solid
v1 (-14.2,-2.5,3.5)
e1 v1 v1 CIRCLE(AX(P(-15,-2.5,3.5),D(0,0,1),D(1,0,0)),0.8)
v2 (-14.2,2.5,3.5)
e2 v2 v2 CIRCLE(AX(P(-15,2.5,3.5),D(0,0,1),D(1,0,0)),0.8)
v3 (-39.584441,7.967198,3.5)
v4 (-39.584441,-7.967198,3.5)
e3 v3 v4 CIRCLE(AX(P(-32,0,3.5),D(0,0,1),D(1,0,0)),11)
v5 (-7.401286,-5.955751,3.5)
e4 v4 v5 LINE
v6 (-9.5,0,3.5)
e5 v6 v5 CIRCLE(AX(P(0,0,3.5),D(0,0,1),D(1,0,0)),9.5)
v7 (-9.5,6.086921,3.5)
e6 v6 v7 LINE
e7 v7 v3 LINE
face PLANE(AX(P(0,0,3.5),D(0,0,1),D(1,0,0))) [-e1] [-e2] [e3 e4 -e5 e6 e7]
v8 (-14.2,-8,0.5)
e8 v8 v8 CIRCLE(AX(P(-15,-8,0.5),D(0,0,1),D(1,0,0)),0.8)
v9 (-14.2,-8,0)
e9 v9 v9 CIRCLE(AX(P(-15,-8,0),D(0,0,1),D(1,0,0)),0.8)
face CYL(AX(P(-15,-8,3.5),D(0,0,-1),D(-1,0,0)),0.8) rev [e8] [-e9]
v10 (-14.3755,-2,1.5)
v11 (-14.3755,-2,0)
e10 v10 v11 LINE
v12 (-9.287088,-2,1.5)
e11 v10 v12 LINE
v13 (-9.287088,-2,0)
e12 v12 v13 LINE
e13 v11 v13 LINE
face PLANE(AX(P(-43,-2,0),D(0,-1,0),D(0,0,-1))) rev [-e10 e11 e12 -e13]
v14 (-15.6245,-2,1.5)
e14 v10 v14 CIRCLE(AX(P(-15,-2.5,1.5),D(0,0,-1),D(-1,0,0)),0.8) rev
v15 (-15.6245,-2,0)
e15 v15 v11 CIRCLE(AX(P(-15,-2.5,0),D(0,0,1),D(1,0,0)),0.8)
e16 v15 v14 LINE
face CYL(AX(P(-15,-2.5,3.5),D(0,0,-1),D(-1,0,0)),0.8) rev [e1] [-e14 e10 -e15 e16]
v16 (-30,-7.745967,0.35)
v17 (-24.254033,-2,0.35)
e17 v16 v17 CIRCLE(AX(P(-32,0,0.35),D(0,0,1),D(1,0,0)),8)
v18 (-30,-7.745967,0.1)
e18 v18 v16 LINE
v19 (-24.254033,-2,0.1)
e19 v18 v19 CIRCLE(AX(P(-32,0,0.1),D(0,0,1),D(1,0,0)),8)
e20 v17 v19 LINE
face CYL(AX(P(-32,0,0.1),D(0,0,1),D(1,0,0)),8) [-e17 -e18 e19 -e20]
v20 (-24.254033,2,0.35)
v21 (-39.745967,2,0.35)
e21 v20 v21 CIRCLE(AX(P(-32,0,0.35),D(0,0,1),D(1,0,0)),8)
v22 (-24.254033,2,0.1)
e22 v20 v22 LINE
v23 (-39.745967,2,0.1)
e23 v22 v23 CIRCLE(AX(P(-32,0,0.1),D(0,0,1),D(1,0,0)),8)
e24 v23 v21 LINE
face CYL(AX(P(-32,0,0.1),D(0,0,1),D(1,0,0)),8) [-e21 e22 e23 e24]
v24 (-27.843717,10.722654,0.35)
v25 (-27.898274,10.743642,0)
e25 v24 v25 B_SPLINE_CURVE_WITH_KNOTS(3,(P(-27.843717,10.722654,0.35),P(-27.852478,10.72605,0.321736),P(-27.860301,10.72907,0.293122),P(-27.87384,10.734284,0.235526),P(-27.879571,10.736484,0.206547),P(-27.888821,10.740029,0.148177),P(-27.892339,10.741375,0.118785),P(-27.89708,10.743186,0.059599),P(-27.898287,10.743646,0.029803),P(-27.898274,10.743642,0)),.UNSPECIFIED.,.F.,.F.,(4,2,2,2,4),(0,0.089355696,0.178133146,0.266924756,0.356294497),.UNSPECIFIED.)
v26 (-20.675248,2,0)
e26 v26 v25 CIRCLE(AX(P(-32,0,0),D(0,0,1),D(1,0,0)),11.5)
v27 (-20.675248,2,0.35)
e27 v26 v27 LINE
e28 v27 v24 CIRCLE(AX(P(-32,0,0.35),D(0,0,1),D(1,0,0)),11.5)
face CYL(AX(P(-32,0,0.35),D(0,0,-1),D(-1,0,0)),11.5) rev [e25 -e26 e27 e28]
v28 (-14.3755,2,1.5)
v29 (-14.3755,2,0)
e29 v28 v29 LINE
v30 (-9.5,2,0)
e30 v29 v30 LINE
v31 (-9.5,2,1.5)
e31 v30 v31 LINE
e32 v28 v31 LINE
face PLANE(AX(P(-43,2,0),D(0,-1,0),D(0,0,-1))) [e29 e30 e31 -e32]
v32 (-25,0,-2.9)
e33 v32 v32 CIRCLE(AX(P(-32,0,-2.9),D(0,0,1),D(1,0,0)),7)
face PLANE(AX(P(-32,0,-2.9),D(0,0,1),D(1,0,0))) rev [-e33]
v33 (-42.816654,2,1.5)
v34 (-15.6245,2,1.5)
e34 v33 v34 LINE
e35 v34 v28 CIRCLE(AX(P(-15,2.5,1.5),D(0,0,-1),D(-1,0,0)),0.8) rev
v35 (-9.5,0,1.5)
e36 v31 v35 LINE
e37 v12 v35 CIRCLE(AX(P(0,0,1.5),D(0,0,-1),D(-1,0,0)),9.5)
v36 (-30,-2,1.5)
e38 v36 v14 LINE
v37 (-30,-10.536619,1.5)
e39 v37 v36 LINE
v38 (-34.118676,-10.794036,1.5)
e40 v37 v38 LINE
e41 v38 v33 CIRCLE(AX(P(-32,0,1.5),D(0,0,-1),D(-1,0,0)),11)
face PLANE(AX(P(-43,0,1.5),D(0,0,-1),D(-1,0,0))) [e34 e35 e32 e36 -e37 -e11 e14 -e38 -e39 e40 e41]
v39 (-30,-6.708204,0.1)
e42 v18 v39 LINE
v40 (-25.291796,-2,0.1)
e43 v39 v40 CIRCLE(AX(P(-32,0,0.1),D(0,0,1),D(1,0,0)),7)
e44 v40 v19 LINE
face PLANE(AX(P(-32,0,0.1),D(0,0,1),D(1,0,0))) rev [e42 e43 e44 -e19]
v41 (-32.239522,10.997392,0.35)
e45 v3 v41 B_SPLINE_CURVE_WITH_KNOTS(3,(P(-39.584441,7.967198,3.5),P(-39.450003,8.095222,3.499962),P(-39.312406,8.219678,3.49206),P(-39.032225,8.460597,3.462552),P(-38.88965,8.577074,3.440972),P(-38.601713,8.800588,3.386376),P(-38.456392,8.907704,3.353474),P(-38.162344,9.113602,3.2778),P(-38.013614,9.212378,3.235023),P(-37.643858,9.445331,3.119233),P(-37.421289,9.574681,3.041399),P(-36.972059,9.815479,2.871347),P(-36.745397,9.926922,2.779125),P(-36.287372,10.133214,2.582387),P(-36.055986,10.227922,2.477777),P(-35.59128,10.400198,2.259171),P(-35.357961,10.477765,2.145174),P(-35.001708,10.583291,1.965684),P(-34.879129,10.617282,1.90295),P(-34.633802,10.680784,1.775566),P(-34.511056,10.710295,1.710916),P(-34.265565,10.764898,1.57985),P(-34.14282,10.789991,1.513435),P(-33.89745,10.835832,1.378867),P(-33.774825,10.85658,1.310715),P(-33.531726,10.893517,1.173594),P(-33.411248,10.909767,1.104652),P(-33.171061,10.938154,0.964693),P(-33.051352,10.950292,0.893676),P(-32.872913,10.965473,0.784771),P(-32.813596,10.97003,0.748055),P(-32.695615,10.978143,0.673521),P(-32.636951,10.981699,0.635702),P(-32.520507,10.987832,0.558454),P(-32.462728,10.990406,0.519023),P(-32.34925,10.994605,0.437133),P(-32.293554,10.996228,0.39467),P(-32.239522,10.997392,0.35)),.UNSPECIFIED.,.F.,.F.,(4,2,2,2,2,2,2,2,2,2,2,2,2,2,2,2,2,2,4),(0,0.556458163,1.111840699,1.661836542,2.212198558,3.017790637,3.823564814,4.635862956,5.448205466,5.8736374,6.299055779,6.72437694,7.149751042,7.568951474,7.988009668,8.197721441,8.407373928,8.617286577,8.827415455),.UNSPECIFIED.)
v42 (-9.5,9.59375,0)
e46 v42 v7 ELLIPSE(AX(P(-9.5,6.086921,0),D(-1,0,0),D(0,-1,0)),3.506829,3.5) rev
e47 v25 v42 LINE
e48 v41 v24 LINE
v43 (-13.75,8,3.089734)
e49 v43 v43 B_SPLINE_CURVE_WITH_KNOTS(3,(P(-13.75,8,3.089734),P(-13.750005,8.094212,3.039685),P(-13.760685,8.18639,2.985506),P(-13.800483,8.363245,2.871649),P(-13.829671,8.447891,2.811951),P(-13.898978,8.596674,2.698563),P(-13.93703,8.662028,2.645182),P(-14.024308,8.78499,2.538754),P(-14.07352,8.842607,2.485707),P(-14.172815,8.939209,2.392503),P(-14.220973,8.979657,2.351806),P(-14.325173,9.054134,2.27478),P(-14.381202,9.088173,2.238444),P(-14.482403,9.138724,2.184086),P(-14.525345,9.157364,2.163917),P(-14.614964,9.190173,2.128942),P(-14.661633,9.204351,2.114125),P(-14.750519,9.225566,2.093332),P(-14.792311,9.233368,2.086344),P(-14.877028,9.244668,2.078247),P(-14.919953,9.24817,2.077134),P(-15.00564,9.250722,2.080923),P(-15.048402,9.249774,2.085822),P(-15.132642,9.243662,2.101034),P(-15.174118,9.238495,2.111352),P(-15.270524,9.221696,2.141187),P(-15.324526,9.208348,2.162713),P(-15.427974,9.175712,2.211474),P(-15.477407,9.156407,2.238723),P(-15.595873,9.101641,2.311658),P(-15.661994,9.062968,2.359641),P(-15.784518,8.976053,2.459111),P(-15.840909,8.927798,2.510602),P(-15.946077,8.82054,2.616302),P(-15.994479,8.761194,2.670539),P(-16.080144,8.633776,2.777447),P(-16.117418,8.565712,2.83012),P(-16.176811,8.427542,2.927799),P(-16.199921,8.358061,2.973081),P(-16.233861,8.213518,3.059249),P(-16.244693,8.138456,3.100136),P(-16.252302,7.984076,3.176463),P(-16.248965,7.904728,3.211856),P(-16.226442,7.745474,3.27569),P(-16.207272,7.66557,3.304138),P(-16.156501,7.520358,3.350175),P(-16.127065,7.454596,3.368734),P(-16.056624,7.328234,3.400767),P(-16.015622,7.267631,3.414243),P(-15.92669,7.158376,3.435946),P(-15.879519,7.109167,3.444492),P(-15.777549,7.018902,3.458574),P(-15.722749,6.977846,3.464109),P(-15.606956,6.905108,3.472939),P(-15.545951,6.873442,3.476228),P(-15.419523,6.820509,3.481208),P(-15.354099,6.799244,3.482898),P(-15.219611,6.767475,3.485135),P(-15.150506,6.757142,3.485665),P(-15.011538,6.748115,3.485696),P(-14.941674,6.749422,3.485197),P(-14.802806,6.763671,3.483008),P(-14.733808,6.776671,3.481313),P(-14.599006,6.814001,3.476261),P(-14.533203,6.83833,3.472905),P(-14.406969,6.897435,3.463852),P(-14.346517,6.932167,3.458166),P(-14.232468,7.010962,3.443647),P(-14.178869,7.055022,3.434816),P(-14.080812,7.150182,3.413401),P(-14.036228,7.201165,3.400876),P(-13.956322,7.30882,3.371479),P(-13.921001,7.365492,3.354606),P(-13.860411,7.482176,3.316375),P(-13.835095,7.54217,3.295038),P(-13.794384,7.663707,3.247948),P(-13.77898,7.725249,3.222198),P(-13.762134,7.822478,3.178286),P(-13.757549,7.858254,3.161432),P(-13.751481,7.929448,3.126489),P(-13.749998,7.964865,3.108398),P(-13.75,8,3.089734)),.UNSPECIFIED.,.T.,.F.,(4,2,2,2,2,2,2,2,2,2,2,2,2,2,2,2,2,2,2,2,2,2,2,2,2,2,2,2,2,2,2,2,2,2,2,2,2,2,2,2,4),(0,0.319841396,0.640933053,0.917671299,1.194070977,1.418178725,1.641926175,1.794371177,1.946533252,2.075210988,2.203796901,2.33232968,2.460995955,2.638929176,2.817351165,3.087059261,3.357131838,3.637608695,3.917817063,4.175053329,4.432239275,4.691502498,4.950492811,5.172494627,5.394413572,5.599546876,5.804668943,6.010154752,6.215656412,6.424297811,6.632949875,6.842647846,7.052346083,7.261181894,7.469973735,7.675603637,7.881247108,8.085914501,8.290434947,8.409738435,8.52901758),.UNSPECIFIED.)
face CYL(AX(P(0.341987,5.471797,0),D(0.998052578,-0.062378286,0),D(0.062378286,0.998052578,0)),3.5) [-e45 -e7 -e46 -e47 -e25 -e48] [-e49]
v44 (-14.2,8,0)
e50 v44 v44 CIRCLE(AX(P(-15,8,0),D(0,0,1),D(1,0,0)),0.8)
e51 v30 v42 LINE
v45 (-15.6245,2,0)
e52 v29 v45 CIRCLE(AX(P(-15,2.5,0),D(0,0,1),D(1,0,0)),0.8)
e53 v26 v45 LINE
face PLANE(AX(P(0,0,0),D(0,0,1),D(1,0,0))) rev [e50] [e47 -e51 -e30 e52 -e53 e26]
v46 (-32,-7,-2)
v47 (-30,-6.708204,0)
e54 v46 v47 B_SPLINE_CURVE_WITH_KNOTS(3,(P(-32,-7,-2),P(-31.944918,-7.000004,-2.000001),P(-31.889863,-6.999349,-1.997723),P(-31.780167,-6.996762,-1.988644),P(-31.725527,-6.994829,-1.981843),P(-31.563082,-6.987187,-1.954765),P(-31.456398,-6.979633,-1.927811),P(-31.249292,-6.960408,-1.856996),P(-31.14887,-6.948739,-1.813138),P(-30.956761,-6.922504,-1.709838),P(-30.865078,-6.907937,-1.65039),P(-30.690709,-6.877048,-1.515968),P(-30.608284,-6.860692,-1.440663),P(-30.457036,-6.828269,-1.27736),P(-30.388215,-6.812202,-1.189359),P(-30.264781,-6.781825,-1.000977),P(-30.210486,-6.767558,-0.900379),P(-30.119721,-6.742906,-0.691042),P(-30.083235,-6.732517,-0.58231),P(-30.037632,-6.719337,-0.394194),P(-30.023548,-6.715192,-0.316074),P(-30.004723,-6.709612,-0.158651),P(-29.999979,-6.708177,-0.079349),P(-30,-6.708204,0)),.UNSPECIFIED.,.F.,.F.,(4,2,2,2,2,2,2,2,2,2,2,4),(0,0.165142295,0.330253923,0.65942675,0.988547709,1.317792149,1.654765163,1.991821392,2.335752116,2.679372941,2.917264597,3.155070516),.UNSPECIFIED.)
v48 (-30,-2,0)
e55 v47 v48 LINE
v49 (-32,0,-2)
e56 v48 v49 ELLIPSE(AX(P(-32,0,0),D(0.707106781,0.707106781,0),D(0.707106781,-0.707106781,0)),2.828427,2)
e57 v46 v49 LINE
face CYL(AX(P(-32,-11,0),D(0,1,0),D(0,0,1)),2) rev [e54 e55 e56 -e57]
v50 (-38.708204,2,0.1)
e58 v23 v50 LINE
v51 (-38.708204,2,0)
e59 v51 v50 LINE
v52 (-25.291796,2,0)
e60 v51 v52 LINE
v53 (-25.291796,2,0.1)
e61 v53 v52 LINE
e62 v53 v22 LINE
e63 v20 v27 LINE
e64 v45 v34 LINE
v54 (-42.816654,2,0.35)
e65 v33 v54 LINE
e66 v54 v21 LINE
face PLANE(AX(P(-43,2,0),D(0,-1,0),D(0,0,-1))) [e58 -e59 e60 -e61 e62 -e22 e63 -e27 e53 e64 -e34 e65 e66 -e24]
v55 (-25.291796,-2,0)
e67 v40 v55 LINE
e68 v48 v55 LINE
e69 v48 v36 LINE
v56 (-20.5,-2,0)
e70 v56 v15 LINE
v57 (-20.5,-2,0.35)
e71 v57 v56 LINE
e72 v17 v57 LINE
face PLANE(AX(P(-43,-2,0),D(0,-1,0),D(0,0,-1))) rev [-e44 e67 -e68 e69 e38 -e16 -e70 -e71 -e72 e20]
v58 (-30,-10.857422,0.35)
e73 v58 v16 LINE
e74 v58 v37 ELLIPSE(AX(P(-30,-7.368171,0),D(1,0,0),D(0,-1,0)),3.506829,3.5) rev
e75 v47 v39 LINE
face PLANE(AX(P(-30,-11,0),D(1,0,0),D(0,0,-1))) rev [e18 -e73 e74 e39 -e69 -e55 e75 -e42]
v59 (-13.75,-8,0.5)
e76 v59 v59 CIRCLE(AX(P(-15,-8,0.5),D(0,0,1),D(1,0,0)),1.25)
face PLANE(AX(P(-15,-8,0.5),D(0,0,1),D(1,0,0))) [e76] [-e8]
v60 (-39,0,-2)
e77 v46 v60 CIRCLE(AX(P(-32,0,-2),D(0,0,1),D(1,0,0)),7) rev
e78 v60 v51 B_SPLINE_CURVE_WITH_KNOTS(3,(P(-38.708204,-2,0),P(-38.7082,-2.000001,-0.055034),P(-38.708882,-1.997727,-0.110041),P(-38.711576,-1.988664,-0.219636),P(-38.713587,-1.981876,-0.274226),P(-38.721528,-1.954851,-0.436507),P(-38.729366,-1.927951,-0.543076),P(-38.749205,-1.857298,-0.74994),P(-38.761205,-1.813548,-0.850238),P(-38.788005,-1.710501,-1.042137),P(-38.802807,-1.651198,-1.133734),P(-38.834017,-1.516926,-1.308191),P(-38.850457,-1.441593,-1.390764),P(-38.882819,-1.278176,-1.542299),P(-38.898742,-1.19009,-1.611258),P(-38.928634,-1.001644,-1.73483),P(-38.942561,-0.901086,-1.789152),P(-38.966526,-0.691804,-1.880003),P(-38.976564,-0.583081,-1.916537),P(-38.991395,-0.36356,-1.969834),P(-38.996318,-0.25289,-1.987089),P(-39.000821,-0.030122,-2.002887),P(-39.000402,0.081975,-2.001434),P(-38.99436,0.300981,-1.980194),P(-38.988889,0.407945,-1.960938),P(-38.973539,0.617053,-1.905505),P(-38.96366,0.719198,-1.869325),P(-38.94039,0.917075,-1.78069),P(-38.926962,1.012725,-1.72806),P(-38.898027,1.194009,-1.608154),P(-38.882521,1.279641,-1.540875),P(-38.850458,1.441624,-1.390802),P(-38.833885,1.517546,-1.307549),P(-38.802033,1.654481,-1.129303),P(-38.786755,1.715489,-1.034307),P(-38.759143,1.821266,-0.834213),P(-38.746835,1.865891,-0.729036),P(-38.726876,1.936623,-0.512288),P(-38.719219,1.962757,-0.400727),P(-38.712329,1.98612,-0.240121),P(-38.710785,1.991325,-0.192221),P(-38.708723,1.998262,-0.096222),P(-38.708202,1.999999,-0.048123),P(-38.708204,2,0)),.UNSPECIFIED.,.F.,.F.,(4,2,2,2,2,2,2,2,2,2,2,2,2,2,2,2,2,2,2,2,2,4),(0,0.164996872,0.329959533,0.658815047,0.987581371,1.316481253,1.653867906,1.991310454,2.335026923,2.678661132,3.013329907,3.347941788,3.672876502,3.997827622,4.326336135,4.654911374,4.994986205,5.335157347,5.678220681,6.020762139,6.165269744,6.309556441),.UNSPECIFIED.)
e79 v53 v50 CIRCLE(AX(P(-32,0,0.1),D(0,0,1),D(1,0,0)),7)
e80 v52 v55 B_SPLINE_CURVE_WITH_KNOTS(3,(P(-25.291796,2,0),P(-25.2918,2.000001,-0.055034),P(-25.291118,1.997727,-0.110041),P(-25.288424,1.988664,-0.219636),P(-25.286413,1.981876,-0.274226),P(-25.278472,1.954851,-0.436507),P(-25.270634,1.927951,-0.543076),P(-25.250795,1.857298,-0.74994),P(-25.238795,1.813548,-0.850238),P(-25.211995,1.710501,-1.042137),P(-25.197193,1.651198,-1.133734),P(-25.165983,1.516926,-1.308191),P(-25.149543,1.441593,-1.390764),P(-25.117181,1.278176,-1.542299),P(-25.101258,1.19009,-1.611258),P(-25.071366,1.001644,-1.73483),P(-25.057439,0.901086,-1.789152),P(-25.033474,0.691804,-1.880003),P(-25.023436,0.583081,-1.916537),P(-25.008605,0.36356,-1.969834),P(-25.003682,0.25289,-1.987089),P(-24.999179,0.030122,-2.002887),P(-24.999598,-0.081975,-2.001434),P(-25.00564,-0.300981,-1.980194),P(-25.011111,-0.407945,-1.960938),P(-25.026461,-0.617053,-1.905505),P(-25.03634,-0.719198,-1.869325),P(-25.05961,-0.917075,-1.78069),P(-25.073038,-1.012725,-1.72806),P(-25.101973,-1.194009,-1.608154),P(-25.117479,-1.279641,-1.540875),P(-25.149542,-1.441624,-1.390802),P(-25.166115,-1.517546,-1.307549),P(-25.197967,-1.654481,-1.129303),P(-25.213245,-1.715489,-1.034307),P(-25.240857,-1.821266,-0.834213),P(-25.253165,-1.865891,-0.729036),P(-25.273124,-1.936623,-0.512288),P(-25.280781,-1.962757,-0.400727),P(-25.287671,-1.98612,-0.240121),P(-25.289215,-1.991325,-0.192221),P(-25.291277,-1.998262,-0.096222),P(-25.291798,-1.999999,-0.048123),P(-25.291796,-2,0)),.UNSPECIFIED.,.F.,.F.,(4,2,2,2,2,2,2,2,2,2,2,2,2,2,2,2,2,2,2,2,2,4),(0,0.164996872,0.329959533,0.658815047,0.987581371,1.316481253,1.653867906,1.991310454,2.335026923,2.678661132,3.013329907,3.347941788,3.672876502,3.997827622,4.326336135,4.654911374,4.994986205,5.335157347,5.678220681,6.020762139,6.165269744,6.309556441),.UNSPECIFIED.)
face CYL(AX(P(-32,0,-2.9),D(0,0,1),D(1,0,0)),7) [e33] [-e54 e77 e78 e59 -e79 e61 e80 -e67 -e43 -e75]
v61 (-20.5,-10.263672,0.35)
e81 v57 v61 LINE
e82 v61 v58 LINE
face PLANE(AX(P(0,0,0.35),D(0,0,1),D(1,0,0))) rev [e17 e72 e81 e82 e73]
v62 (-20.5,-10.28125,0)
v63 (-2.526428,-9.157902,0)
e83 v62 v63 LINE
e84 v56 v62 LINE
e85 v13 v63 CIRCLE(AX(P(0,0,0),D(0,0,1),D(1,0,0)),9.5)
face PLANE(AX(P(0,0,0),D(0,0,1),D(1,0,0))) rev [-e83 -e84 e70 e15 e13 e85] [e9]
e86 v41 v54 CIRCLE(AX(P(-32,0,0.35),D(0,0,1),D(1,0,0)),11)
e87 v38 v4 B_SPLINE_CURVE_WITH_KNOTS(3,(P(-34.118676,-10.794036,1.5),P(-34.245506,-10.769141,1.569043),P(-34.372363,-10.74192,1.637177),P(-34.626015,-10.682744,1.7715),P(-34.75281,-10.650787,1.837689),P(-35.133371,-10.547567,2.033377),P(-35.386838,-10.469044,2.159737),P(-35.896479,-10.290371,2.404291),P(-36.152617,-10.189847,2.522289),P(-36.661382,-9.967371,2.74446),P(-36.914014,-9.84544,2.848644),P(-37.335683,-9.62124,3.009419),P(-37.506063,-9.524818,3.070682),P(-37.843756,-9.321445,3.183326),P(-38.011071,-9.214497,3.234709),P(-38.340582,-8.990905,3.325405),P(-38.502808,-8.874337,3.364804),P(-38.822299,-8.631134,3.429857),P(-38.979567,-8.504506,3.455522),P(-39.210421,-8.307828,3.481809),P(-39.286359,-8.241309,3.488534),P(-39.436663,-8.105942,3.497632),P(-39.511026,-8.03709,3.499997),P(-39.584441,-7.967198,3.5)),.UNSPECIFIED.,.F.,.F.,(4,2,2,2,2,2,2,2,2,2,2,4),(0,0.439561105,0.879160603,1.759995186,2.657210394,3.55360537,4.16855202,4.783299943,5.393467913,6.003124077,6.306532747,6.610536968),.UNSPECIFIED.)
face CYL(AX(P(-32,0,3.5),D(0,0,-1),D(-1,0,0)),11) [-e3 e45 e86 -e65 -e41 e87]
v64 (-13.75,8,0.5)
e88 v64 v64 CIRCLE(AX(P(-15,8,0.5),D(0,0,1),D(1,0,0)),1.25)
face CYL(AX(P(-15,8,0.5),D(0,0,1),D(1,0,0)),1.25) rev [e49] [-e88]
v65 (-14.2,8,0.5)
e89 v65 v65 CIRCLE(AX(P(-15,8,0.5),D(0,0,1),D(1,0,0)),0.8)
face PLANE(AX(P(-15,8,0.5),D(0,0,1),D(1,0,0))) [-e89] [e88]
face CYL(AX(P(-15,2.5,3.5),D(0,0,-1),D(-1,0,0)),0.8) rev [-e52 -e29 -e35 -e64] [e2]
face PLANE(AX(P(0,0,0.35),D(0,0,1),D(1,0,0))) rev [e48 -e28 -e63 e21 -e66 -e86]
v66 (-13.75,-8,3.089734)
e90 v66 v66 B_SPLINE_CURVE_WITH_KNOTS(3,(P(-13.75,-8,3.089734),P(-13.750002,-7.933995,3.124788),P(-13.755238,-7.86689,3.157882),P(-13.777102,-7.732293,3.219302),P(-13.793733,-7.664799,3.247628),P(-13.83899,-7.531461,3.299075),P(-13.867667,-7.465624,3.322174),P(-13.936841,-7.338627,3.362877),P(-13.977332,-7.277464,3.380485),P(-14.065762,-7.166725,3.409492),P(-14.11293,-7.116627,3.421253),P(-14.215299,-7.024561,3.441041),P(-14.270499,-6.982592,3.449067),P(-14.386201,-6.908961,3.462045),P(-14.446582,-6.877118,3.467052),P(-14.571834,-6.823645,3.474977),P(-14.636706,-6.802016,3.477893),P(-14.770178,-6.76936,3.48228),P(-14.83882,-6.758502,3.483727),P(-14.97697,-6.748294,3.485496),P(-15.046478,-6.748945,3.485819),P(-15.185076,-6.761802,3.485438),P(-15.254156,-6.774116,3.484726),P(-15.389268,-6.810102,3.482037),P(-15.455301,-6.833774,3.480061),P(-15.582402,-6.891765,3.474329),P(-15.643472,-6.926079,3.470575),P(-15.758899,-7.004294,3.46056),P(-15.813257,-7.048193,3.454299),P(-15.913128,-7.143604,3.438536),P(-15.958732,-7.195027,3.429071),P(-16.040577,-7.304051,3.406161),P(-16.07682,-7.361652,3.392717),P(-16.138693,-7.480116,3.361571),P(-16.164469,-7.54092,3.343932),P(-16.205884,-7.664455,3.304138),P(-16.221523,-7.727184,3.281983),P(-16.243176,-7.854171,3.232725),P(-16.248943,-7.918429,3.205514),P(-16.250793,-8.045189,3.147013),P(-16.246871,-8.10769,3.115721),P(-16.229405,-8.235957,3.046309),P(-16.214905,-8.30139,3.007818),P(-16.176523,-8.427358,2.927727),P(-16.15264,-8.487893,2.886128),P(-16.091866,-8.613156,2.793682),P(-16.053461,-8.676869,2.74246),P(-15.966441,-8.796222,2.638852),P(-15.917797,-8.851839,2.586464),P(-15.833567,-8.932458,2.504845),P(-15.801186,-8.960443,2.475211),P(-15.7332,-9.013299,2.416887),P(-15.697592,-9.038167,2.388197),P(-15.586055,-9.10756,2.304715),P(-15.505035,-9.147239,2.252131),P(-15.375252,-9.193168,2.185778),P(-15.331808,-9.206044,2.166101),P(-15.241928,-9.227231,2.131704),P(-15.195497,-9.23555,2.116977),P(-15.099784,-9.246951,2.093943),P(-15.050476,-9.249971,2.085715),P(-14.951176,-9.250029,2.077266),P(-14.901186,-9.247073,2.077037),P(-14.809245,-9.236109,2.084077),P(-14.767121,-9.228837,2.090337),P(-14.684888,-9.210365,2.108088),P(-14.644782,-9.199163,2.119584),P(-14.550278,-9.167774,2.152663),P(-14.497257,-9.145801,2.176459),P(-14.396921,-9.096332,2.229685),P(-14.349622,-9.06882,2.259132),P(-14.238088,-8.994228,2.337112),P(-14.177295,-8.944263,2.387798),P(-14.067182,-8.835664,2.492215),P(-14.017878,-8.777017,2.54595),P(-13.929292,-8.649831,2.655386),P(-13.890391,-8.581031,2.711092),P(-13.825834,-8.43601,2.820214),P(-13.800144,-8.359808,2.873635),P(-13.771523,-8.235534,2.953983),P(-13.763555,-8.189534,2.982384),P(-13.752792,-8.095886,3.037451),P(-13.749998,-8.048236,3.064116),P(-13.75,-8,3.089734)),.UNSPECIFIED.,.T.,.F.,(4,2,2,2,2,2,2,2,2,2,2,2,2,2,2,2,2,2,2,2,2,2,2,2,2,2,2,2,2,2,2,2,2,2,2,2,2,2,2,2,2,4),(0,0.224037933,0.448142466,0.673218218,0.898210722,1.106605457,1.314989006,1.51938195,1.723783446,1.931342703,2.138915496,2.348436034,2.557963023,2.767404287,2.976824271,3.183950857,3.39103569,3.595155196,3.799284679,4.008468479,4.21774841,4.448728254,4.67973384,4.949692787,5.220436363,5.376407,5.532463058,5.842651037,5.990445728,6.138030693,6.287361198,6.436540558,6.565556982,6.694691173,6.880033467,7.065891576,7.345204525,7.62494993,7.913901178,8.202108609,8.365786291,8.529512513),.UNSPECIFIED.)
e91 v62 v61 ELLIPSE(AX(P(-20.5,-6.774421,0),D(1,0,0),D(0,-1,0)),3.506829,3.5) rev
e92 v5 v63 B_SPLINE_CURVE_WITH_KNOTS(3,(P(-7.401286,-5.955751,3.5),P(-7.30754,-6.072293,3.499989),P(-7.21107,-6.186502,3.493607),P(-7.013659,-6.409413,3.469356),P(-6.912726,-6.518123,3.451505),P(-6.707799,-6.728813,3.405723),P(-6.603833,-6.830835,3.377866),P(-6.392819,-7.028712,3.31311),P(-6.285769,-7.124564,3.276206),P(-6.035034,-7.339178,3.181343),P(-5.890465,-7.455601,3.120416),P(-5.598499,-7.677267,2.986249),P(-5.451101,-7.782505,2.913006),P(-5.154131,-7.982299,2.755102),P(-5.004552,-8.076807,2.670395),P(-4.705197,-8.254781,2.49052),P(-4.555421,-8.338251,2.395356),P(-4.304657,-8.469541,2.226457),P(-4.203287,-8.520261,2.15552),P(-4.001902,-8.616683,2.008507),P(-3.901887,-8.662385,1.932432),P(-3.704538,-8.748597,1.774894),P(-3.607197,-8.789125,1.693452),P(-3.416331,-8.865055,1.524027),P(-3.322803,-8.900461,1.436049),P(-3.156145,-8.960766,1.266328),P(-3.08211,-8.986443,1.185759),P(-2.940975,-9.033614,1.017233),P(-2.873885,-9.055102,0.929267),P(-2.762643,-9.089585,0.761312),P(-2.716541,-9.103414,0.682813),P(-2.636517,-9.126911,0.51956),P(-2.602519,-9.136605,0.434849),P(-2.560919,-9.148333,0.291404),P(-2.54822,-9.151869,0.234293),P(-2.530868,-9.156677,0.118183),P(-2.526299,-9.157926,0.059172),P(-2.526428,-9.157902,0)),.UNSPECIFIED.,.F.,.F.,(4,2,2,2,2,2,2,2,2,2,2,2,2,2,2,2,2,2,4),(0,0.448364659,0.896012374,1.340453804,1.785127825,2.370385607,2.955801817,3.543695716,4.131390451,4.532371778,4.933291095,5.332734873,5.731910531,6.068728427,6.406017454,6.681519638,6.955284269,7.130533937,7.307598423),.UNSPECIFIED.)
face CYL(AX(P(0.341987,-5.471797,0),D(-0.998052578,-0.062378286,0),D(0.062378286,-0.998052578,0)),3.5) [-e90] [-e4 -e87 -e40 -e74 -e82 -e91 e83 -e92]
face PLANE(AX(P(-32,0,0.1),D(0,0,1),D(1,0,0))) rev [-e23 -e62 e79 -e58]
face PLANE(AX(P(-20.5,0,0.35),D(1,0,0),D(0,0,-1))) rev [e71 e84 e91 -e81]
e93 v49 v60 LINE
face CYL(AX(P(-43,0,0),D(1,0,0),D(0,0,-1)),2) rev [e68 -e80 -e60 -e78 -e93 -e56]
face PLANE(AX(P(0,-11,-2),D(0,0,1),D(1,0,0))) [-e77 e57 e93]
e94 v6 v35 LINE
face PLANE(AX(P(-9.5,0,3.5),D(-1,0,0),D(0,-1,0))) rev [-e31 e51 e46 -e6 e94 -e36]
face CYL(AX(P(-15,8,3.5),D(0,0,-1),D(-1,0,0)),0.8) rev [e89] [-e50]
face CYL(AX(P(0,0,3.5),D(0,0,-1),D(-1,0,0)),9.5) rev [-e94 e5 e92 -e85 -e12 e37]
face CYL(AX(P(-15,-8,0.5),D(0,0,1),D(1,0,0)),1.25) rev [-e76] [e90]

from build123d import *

# Parameters (mm, degrees)
BOSS_EXTRUDE1_DEPTH = 3.5
SKETCH8_R           = 11.5
JOINT_HOLE_DEPTH    = 0.35
JOINT_START         = 0.35
SKETCH3_R           = 7
JOINT_INSERT_DEPTH  = 3.25
FRICTION_START      = 0.35
SKETCH4_R           = 8
SKETCH4_R_2         = 7
FRICTION_DEPTH      = 0.25
CUT_EXTRUDE2_DEPTH  = 43
CUT_EXTRUDE3_DEPTH  = 11
SKETCH2_R           = 0.8
SCREW_HOLES_DEPTH   = 45.522466239
FILLET1_R           = 3.5
CUT_EXTRUDE4_START  = 3.5
SKETCH9_R           = 1.25
CUT_EXTRUDE4_DEPTH  = 3


with BuildPart() as part:
    # Sketch1 → Boss-Extrude1 (new body)
    with BuildSketch(Plane.XY):
        with BuildLine():
            ThreePointArc((-2.526427532, -9.157901721), (-7.558143342, -5.755386106), (-9.5, 0))
            Line((-9.5, 0), (-9.5, 9.59375))
            Line((-9.5, 9.59375), (-32, 11))
            ThreePointArc((-32, 11), (-43, 0), (-32, -11))
            Line((-32, -11), (-2.526427532, -9.157901721))
        make_face()
    extrude(amount=BOSS_EXTRUDE1_DEPTH)

    # Sketch8 → Joint Hole (cut)
    with BuildSketch(Plane.XY):
        with Locations((-32, 0)):
            Circle(SKETCH8_R)
        with BuildLine():
            Line((-20.5, -11.5), (-20.5, 0))
            ThreePointArc((-20.5, 0), (-23.868272016, -8.131727984), (-32, -11.5))
            Line((-32, -11.5), (-20.5, -11.5))
        make_face()
    extrude(amount=JOINT_HOLE_DEPTH, mode=Mode.SUBTRACT)

    # Sketch3 → Joint Insert (add)
    with BuildSketch(Plane.XY.offset(JOINT_START)):
        with Locations((-32, 0)):
            Circle(SKETCH3_R)
    extrude(amount=-JOINT_INSERT_DEPTH)

    # Sketch4 → Friction (add)
    with BuildSketch(Plane.XY.offset(FRICTION_START)):
        with Locations((-32, 0)):
            Circle(SKETCH4_R)
        with Locations((-32, 0)):
            Circle(SKETCH4_R_2, mode=Mode.SUBTRACT)
    extrude(amount=-FRICTION_DEPTH)

    # Sketch6 → Cut-Extrude2 (cut)
    with BuildSketch(Plane(origin=(0, 0, 0), x_dir=(0, 0, -1), z_dir=(1, 0, 0))):
        with BuildLine():
            Line((-1.5, 0), (-1.5, 2))
            Line((-1.5, 2), (0, 2))
            ThreePointArc((0, 2), (2, 0), (0, -2))
            Line((0, -2), (-1.5, -2))
            Line((-1.5, -2), (-1.5, 0))
        make_face()
    extrude(amount=-CUT_EXTRUDE2_DEPTH, mode=Mode.SUBTRACT)

    # Sketch7 → Cut-Extrude3 (cut)
    with BuildSketch(Plane(origin=(0, 0, 0), x_dir=(1, 0, 0), z_dir=(0, 1, 0))):
        with BuildLine():
            Line((-32, -1.5), (-30, -1.5))
            Line((-30, -1.5), (-30, 0))
            ThreePointArc((-30, 0), (-30.585786438, 1.414213562), (-32, 2))
            Line((-32, 2), (-43, 2))
            Line((-43, 2), (-43, -1.5))
            Line((-43, -1.5), (-32, -1.5))
        make_face()
    extrude(amount=-CUT_EXTRUDE3_DEPTH, mode=Mode.SUBTRACT)

    # Sketch2 → Screw Holes (cut, through all)
    with BuildSketch(Plane.XY):
        with Locations((-15, 8)):
            Circle(SKETCH2_R)
        with Locations((-15, -8)):
            Circle(SKETCH2_R)
        with Locations(Location((-15, 2.5, 0), (0, 0, 218.682187453))):
            Circle(SKETCH2_R)
        with Locations(Location((-15, -2.5, 0), (0, 0, 141.317812547))):
            Circle(SKETCH2_R)
    extrude(amount=SCREW_HOLES_DEPTH, mode=Mode.SUBTRACT)

    # Fillet1
    # the kernel refuses this fillet: 3.5 mm, written as the material it takes off along each edge
    with BuildSketch(Plane(origin=(-40.732960062, -11.545810004, 3.5), x_dir=(-0.062378286155180485, 0.9980525784828885, 0), z_dir=(0.9980525784828886, 0.06237828615518049, 0))) as fillet1_piece_1:
        with BuildLine():
            CenterArc((FILLET1_R, -FILLET1_R), FILLET1_R, 90, 90)
            Line((0, -FILLET1_R), (0, 0))
            Line((0, 0), (FILLET1_R, 0))
        make_face()
    extrude(amount=47.031081933, mode=Mode.SUBTRACT)
    with BuildSketch(Plane(origin=(-0.767039938, 9.047939996, 3.5), x_dir=(-0.06237828615518047, -0.9980525784828886, 0), z_dir=(-0.9980525784828886, 0.062378286155180464, 0))) as fillet1_piece_2:
        with BuildLine():
            CenterArc((FILLET1_R, -FILLET1_R), FILLET1_R, 90, 90)
            Line((0, -FILLET1_R), (0, 0))
            Line((0, 0), (FILLET1_R, 0))
        make_face()
    extrude(amount=40.043902481, mode=Mode.SUBTRACT)

    # Sketch9 → Cut-Extrude4 (cut)
    with BuildSketch(Plane.XY.offset(CUT_EXTRUDE4_START)):
        with Locations((-15, 8)):
            Circle(SKETCH9_R)
        with Locations((-15, -8)):
            Circle(SKETCH9_R)
    extrude(amount=-CUT_EXTRUDE4_DEPTH, mode=Mode.SUBTRACT)


solid = part.part
